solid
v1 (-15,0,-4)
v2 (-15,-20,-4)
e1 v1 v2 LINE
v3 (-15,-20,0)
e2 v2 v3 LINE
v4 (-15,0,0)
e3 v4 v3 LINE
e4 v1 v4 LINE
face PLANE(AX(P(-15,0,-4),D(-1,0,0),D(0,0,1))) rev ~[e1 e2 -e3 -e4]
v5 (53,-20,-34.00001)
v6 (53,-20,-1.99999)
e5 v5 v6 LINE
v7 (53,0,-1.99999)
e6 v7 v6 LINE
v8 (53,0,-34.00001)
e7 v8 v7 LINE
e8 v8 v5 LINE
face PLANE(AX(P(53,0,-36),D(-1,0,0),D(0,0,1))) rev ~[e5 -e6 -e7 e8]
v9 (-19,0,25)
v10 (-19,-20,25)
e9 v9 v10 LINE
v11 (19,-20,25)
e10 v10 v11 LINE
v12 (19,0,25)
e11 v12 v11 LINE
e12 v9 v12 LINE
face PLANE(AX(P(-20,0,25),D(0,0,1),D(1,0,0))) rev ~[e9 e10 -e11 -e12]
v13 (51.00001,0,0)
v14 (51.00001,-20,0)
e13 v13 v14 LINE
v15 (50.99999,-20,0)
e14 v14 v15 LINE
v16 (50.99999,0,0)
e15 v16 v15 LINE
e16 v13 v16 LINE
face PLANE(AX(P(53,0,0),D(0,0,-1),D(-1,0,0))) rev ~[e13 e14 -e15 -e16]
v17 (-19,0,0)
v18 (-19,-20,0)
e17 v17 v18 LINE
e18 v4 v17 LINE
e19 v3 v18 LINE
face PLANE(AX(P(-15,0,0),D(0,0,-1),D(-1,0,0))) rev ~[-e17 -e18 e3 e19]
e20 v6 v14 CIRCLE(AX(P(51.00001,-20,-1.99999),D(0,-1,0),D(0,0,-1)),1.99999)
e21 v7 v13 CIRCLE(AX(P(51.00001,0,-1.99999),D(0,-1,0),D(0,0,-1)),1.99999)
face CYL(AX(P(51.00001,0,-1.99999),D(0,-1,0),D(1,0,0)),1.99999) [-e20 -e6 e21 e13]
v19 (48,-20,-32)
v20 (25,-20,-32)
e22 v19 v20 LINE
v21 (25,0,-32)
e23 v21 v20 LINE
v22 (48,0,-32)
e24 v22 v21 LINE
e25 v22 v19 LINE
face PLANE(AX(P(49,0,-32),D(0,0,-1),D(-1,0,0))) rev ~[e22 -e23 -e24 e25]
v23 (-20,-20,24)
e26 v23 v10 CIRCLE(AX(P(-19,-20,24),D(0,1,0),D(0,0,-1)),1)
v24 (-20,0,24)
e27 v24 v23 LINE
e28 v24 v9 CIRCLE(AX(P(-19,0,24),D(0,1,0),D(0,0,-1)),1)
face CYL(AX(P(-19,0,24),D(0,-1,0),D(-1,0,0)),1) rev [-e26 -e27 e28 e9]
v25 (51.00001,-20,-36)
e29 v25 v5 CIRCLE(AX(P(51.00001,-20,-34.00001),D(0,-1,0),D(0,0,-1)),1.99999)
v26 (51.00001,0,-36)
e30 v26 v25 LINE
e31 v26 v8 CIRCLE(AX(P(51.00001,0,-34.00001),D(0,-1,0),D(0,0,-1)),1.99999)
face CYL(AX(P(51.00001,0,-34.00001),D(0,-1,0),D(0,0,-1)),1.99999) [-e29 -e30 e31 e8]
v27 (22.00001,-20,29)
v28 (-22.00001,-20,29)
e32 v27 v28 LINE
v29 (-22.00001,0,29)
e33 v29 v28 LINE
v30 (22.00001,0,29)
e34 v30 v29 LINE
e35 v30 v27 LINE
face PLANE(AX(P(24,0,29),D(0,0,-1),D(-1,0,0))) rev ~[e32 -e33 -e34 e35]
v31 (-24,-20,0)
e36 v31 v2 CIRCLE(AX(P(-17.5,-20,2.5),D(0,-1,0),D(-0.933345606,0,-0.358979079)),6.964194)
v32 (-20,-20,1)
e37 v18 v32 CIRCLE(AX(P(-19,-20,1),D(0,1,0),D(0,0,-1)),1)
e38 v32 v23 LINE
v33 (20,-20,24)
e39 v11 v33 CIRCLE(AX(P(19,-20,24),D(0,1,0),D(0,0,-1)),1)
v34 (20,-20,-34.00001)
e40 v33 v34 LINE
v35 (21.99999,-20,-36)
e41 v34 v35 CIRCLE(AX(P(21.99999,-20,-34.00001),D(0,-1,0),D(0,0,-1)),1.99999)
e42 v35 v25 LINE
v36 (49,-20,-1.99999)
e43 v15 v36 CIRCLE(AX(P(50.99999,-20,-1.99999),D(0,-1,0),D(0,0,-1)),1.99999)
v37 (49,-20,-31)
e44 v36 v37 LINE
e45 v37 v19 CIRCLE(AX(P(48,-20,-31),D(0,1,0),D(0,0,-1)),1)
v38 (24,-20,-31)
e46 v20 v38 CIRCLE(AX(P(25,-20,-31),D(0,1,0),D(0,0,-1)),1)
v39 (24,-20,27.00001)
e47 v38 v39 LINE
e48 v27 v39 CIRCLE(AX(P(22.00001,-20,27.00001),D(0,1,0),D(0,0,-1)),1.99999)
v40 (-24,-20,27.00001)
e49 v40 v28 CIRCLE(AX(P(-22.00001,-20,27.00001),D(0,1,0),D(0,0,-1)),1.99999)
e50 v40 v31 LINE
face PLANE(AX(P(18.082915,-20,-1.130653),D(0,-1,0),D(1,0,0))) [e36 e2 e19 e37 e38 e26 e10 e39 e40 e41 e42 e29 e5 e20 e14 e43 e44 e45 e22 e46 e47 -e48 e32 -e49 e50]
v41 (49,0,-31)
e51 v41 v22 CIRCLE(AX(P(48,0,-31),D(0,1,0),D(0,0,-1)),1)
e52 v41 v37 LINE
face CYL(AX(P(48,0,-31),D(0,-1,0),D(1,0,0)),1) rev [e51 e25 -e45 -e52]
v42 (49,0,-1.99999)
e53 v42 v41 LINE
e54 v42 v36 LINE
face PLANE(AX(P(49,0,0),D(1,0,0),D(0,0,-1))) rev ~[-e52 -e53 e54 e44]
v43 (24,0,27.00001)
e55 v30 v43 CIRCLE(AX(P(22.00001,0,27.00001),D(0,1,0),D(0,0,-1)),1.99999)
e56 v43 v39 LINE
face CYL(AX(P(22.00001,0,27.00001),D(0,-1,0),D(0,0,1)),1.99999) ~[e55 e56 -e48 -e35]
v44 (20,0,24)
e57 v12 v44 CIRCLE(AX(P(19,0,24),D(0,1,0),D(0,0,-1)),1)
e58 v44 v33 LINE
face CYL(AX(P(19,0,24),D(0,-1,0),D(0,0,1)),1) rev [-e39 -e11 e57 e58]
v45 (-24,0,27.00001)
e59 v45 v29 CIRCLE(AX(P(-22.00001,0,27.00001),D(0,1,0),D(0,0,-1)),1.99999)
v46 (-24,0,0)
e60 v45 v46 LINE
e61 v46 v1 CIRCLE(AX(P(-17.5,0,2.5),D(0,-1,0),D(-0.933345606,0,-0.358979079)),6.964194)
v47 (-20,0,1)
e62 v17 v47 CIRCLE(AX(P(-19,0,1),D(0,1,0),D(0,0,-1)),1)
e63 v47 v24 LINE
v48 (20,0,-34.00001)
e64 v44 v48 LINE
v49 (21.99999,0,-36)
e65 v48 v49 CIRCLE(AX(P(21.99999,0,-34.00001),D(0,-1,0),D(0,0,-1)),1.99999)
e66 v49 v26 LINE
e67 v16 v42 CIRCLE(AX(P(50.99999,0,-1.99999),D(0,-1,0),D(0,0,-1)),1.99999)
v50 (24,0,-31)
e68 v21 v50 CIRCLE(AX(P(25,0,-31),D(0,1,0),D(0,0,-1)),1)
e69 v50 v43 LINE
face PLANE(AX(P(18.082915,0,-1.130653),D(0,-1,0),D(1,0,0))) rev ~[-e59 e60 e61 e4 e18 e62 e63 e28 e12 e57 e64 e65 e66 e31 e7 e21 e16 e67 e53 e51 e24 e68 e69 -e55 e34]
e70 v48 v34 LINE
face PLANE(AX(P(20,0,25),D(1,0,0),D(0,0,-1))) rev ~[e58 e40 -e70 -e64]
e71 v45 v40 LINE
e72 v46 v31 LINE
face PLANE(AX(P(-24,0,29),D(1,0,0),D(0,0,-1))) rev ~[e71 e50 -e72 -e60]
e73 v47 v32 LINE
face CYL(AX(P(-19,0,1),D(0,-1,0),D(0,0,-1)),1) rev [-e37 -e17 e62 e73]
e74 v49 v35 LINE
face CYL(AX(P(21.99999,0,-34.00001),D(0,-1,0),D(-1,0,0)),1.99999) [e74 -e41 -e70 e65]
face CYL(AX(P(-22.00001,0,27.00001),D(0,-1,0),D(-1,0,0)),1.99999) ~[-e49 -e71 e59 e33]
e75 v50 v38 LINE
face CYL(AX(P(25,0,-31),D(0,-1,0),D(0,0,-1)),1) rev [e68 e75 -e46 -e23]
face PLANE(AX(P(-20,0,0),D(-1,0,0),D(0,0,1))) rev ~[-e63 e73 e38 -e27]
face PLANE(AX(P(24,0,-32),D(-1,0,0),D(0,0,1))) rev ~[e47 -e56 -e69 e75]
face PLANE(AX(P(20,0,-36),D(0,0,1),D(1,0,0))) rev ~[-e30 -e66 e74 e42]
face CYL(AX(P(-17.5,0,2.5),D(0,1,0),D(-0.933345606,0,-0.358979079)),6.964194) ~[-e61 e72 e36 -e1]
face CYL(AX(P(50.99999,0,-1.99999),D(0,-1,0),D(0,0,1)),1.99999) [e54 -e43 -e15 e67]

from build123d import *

# Parameters (mm, degrees)
F1_DEPTH = 20
F2_R     = 1
F3_R     = 1.99999


# Not quite as in the source:
# - a fillet or chamfer is up to 0.001 mm smaller than in the source, because OpenCascade refuses the exact size


with BuildPart() as f1:
    # F0 (on Front) → F1 (new body)
    with BuildSketch(Plane.XZ):
        Polygon((-24, 29), (-24, 0), (-20, 0), (-20, 25), (20, 25), (20, -36), (53, -36), (53, 0), (49, 0), (49, -32), (24, -32), (24, 29), align=None)
        with BuildLine():
            Line((-20, 0), (-24, 0))
            ThreePointArc((-24, 0), (-20.3284271247, -3.8639610307), (-15, -4))
            Line((-15, -4), (-15, 0))
            Line((-15, 0), (-20, 0))
        make_face()
    extrude(amount=F1_DEPTH)

    # F2
    f2_edges = [f1.edges().sort_by_distance(p)[0] for p in [
        (-20, -10, 0),
        (-20, -10, 25),
        (20, -10, 25),
        (24, -10, -32),
        (49, -10, -32),
    ]]
    fillet(f2_edges, radius=F2_R)

    # F3 (radius 2 in the source; OpenCascade refuses exactly that, so slightly less here)
    f3_edges = [f1.edges().sort_by_distance(p)[0] for p in [
        (-24, -10, 29),
        (24, -10, 29),
        (20, -10, -36),
        (53, -10, -36),
        (49, -10, 0),
        (53, -10, 0),
    ]]
    fillet(f3_edges, radius=F3_R)


solid = f1.part
